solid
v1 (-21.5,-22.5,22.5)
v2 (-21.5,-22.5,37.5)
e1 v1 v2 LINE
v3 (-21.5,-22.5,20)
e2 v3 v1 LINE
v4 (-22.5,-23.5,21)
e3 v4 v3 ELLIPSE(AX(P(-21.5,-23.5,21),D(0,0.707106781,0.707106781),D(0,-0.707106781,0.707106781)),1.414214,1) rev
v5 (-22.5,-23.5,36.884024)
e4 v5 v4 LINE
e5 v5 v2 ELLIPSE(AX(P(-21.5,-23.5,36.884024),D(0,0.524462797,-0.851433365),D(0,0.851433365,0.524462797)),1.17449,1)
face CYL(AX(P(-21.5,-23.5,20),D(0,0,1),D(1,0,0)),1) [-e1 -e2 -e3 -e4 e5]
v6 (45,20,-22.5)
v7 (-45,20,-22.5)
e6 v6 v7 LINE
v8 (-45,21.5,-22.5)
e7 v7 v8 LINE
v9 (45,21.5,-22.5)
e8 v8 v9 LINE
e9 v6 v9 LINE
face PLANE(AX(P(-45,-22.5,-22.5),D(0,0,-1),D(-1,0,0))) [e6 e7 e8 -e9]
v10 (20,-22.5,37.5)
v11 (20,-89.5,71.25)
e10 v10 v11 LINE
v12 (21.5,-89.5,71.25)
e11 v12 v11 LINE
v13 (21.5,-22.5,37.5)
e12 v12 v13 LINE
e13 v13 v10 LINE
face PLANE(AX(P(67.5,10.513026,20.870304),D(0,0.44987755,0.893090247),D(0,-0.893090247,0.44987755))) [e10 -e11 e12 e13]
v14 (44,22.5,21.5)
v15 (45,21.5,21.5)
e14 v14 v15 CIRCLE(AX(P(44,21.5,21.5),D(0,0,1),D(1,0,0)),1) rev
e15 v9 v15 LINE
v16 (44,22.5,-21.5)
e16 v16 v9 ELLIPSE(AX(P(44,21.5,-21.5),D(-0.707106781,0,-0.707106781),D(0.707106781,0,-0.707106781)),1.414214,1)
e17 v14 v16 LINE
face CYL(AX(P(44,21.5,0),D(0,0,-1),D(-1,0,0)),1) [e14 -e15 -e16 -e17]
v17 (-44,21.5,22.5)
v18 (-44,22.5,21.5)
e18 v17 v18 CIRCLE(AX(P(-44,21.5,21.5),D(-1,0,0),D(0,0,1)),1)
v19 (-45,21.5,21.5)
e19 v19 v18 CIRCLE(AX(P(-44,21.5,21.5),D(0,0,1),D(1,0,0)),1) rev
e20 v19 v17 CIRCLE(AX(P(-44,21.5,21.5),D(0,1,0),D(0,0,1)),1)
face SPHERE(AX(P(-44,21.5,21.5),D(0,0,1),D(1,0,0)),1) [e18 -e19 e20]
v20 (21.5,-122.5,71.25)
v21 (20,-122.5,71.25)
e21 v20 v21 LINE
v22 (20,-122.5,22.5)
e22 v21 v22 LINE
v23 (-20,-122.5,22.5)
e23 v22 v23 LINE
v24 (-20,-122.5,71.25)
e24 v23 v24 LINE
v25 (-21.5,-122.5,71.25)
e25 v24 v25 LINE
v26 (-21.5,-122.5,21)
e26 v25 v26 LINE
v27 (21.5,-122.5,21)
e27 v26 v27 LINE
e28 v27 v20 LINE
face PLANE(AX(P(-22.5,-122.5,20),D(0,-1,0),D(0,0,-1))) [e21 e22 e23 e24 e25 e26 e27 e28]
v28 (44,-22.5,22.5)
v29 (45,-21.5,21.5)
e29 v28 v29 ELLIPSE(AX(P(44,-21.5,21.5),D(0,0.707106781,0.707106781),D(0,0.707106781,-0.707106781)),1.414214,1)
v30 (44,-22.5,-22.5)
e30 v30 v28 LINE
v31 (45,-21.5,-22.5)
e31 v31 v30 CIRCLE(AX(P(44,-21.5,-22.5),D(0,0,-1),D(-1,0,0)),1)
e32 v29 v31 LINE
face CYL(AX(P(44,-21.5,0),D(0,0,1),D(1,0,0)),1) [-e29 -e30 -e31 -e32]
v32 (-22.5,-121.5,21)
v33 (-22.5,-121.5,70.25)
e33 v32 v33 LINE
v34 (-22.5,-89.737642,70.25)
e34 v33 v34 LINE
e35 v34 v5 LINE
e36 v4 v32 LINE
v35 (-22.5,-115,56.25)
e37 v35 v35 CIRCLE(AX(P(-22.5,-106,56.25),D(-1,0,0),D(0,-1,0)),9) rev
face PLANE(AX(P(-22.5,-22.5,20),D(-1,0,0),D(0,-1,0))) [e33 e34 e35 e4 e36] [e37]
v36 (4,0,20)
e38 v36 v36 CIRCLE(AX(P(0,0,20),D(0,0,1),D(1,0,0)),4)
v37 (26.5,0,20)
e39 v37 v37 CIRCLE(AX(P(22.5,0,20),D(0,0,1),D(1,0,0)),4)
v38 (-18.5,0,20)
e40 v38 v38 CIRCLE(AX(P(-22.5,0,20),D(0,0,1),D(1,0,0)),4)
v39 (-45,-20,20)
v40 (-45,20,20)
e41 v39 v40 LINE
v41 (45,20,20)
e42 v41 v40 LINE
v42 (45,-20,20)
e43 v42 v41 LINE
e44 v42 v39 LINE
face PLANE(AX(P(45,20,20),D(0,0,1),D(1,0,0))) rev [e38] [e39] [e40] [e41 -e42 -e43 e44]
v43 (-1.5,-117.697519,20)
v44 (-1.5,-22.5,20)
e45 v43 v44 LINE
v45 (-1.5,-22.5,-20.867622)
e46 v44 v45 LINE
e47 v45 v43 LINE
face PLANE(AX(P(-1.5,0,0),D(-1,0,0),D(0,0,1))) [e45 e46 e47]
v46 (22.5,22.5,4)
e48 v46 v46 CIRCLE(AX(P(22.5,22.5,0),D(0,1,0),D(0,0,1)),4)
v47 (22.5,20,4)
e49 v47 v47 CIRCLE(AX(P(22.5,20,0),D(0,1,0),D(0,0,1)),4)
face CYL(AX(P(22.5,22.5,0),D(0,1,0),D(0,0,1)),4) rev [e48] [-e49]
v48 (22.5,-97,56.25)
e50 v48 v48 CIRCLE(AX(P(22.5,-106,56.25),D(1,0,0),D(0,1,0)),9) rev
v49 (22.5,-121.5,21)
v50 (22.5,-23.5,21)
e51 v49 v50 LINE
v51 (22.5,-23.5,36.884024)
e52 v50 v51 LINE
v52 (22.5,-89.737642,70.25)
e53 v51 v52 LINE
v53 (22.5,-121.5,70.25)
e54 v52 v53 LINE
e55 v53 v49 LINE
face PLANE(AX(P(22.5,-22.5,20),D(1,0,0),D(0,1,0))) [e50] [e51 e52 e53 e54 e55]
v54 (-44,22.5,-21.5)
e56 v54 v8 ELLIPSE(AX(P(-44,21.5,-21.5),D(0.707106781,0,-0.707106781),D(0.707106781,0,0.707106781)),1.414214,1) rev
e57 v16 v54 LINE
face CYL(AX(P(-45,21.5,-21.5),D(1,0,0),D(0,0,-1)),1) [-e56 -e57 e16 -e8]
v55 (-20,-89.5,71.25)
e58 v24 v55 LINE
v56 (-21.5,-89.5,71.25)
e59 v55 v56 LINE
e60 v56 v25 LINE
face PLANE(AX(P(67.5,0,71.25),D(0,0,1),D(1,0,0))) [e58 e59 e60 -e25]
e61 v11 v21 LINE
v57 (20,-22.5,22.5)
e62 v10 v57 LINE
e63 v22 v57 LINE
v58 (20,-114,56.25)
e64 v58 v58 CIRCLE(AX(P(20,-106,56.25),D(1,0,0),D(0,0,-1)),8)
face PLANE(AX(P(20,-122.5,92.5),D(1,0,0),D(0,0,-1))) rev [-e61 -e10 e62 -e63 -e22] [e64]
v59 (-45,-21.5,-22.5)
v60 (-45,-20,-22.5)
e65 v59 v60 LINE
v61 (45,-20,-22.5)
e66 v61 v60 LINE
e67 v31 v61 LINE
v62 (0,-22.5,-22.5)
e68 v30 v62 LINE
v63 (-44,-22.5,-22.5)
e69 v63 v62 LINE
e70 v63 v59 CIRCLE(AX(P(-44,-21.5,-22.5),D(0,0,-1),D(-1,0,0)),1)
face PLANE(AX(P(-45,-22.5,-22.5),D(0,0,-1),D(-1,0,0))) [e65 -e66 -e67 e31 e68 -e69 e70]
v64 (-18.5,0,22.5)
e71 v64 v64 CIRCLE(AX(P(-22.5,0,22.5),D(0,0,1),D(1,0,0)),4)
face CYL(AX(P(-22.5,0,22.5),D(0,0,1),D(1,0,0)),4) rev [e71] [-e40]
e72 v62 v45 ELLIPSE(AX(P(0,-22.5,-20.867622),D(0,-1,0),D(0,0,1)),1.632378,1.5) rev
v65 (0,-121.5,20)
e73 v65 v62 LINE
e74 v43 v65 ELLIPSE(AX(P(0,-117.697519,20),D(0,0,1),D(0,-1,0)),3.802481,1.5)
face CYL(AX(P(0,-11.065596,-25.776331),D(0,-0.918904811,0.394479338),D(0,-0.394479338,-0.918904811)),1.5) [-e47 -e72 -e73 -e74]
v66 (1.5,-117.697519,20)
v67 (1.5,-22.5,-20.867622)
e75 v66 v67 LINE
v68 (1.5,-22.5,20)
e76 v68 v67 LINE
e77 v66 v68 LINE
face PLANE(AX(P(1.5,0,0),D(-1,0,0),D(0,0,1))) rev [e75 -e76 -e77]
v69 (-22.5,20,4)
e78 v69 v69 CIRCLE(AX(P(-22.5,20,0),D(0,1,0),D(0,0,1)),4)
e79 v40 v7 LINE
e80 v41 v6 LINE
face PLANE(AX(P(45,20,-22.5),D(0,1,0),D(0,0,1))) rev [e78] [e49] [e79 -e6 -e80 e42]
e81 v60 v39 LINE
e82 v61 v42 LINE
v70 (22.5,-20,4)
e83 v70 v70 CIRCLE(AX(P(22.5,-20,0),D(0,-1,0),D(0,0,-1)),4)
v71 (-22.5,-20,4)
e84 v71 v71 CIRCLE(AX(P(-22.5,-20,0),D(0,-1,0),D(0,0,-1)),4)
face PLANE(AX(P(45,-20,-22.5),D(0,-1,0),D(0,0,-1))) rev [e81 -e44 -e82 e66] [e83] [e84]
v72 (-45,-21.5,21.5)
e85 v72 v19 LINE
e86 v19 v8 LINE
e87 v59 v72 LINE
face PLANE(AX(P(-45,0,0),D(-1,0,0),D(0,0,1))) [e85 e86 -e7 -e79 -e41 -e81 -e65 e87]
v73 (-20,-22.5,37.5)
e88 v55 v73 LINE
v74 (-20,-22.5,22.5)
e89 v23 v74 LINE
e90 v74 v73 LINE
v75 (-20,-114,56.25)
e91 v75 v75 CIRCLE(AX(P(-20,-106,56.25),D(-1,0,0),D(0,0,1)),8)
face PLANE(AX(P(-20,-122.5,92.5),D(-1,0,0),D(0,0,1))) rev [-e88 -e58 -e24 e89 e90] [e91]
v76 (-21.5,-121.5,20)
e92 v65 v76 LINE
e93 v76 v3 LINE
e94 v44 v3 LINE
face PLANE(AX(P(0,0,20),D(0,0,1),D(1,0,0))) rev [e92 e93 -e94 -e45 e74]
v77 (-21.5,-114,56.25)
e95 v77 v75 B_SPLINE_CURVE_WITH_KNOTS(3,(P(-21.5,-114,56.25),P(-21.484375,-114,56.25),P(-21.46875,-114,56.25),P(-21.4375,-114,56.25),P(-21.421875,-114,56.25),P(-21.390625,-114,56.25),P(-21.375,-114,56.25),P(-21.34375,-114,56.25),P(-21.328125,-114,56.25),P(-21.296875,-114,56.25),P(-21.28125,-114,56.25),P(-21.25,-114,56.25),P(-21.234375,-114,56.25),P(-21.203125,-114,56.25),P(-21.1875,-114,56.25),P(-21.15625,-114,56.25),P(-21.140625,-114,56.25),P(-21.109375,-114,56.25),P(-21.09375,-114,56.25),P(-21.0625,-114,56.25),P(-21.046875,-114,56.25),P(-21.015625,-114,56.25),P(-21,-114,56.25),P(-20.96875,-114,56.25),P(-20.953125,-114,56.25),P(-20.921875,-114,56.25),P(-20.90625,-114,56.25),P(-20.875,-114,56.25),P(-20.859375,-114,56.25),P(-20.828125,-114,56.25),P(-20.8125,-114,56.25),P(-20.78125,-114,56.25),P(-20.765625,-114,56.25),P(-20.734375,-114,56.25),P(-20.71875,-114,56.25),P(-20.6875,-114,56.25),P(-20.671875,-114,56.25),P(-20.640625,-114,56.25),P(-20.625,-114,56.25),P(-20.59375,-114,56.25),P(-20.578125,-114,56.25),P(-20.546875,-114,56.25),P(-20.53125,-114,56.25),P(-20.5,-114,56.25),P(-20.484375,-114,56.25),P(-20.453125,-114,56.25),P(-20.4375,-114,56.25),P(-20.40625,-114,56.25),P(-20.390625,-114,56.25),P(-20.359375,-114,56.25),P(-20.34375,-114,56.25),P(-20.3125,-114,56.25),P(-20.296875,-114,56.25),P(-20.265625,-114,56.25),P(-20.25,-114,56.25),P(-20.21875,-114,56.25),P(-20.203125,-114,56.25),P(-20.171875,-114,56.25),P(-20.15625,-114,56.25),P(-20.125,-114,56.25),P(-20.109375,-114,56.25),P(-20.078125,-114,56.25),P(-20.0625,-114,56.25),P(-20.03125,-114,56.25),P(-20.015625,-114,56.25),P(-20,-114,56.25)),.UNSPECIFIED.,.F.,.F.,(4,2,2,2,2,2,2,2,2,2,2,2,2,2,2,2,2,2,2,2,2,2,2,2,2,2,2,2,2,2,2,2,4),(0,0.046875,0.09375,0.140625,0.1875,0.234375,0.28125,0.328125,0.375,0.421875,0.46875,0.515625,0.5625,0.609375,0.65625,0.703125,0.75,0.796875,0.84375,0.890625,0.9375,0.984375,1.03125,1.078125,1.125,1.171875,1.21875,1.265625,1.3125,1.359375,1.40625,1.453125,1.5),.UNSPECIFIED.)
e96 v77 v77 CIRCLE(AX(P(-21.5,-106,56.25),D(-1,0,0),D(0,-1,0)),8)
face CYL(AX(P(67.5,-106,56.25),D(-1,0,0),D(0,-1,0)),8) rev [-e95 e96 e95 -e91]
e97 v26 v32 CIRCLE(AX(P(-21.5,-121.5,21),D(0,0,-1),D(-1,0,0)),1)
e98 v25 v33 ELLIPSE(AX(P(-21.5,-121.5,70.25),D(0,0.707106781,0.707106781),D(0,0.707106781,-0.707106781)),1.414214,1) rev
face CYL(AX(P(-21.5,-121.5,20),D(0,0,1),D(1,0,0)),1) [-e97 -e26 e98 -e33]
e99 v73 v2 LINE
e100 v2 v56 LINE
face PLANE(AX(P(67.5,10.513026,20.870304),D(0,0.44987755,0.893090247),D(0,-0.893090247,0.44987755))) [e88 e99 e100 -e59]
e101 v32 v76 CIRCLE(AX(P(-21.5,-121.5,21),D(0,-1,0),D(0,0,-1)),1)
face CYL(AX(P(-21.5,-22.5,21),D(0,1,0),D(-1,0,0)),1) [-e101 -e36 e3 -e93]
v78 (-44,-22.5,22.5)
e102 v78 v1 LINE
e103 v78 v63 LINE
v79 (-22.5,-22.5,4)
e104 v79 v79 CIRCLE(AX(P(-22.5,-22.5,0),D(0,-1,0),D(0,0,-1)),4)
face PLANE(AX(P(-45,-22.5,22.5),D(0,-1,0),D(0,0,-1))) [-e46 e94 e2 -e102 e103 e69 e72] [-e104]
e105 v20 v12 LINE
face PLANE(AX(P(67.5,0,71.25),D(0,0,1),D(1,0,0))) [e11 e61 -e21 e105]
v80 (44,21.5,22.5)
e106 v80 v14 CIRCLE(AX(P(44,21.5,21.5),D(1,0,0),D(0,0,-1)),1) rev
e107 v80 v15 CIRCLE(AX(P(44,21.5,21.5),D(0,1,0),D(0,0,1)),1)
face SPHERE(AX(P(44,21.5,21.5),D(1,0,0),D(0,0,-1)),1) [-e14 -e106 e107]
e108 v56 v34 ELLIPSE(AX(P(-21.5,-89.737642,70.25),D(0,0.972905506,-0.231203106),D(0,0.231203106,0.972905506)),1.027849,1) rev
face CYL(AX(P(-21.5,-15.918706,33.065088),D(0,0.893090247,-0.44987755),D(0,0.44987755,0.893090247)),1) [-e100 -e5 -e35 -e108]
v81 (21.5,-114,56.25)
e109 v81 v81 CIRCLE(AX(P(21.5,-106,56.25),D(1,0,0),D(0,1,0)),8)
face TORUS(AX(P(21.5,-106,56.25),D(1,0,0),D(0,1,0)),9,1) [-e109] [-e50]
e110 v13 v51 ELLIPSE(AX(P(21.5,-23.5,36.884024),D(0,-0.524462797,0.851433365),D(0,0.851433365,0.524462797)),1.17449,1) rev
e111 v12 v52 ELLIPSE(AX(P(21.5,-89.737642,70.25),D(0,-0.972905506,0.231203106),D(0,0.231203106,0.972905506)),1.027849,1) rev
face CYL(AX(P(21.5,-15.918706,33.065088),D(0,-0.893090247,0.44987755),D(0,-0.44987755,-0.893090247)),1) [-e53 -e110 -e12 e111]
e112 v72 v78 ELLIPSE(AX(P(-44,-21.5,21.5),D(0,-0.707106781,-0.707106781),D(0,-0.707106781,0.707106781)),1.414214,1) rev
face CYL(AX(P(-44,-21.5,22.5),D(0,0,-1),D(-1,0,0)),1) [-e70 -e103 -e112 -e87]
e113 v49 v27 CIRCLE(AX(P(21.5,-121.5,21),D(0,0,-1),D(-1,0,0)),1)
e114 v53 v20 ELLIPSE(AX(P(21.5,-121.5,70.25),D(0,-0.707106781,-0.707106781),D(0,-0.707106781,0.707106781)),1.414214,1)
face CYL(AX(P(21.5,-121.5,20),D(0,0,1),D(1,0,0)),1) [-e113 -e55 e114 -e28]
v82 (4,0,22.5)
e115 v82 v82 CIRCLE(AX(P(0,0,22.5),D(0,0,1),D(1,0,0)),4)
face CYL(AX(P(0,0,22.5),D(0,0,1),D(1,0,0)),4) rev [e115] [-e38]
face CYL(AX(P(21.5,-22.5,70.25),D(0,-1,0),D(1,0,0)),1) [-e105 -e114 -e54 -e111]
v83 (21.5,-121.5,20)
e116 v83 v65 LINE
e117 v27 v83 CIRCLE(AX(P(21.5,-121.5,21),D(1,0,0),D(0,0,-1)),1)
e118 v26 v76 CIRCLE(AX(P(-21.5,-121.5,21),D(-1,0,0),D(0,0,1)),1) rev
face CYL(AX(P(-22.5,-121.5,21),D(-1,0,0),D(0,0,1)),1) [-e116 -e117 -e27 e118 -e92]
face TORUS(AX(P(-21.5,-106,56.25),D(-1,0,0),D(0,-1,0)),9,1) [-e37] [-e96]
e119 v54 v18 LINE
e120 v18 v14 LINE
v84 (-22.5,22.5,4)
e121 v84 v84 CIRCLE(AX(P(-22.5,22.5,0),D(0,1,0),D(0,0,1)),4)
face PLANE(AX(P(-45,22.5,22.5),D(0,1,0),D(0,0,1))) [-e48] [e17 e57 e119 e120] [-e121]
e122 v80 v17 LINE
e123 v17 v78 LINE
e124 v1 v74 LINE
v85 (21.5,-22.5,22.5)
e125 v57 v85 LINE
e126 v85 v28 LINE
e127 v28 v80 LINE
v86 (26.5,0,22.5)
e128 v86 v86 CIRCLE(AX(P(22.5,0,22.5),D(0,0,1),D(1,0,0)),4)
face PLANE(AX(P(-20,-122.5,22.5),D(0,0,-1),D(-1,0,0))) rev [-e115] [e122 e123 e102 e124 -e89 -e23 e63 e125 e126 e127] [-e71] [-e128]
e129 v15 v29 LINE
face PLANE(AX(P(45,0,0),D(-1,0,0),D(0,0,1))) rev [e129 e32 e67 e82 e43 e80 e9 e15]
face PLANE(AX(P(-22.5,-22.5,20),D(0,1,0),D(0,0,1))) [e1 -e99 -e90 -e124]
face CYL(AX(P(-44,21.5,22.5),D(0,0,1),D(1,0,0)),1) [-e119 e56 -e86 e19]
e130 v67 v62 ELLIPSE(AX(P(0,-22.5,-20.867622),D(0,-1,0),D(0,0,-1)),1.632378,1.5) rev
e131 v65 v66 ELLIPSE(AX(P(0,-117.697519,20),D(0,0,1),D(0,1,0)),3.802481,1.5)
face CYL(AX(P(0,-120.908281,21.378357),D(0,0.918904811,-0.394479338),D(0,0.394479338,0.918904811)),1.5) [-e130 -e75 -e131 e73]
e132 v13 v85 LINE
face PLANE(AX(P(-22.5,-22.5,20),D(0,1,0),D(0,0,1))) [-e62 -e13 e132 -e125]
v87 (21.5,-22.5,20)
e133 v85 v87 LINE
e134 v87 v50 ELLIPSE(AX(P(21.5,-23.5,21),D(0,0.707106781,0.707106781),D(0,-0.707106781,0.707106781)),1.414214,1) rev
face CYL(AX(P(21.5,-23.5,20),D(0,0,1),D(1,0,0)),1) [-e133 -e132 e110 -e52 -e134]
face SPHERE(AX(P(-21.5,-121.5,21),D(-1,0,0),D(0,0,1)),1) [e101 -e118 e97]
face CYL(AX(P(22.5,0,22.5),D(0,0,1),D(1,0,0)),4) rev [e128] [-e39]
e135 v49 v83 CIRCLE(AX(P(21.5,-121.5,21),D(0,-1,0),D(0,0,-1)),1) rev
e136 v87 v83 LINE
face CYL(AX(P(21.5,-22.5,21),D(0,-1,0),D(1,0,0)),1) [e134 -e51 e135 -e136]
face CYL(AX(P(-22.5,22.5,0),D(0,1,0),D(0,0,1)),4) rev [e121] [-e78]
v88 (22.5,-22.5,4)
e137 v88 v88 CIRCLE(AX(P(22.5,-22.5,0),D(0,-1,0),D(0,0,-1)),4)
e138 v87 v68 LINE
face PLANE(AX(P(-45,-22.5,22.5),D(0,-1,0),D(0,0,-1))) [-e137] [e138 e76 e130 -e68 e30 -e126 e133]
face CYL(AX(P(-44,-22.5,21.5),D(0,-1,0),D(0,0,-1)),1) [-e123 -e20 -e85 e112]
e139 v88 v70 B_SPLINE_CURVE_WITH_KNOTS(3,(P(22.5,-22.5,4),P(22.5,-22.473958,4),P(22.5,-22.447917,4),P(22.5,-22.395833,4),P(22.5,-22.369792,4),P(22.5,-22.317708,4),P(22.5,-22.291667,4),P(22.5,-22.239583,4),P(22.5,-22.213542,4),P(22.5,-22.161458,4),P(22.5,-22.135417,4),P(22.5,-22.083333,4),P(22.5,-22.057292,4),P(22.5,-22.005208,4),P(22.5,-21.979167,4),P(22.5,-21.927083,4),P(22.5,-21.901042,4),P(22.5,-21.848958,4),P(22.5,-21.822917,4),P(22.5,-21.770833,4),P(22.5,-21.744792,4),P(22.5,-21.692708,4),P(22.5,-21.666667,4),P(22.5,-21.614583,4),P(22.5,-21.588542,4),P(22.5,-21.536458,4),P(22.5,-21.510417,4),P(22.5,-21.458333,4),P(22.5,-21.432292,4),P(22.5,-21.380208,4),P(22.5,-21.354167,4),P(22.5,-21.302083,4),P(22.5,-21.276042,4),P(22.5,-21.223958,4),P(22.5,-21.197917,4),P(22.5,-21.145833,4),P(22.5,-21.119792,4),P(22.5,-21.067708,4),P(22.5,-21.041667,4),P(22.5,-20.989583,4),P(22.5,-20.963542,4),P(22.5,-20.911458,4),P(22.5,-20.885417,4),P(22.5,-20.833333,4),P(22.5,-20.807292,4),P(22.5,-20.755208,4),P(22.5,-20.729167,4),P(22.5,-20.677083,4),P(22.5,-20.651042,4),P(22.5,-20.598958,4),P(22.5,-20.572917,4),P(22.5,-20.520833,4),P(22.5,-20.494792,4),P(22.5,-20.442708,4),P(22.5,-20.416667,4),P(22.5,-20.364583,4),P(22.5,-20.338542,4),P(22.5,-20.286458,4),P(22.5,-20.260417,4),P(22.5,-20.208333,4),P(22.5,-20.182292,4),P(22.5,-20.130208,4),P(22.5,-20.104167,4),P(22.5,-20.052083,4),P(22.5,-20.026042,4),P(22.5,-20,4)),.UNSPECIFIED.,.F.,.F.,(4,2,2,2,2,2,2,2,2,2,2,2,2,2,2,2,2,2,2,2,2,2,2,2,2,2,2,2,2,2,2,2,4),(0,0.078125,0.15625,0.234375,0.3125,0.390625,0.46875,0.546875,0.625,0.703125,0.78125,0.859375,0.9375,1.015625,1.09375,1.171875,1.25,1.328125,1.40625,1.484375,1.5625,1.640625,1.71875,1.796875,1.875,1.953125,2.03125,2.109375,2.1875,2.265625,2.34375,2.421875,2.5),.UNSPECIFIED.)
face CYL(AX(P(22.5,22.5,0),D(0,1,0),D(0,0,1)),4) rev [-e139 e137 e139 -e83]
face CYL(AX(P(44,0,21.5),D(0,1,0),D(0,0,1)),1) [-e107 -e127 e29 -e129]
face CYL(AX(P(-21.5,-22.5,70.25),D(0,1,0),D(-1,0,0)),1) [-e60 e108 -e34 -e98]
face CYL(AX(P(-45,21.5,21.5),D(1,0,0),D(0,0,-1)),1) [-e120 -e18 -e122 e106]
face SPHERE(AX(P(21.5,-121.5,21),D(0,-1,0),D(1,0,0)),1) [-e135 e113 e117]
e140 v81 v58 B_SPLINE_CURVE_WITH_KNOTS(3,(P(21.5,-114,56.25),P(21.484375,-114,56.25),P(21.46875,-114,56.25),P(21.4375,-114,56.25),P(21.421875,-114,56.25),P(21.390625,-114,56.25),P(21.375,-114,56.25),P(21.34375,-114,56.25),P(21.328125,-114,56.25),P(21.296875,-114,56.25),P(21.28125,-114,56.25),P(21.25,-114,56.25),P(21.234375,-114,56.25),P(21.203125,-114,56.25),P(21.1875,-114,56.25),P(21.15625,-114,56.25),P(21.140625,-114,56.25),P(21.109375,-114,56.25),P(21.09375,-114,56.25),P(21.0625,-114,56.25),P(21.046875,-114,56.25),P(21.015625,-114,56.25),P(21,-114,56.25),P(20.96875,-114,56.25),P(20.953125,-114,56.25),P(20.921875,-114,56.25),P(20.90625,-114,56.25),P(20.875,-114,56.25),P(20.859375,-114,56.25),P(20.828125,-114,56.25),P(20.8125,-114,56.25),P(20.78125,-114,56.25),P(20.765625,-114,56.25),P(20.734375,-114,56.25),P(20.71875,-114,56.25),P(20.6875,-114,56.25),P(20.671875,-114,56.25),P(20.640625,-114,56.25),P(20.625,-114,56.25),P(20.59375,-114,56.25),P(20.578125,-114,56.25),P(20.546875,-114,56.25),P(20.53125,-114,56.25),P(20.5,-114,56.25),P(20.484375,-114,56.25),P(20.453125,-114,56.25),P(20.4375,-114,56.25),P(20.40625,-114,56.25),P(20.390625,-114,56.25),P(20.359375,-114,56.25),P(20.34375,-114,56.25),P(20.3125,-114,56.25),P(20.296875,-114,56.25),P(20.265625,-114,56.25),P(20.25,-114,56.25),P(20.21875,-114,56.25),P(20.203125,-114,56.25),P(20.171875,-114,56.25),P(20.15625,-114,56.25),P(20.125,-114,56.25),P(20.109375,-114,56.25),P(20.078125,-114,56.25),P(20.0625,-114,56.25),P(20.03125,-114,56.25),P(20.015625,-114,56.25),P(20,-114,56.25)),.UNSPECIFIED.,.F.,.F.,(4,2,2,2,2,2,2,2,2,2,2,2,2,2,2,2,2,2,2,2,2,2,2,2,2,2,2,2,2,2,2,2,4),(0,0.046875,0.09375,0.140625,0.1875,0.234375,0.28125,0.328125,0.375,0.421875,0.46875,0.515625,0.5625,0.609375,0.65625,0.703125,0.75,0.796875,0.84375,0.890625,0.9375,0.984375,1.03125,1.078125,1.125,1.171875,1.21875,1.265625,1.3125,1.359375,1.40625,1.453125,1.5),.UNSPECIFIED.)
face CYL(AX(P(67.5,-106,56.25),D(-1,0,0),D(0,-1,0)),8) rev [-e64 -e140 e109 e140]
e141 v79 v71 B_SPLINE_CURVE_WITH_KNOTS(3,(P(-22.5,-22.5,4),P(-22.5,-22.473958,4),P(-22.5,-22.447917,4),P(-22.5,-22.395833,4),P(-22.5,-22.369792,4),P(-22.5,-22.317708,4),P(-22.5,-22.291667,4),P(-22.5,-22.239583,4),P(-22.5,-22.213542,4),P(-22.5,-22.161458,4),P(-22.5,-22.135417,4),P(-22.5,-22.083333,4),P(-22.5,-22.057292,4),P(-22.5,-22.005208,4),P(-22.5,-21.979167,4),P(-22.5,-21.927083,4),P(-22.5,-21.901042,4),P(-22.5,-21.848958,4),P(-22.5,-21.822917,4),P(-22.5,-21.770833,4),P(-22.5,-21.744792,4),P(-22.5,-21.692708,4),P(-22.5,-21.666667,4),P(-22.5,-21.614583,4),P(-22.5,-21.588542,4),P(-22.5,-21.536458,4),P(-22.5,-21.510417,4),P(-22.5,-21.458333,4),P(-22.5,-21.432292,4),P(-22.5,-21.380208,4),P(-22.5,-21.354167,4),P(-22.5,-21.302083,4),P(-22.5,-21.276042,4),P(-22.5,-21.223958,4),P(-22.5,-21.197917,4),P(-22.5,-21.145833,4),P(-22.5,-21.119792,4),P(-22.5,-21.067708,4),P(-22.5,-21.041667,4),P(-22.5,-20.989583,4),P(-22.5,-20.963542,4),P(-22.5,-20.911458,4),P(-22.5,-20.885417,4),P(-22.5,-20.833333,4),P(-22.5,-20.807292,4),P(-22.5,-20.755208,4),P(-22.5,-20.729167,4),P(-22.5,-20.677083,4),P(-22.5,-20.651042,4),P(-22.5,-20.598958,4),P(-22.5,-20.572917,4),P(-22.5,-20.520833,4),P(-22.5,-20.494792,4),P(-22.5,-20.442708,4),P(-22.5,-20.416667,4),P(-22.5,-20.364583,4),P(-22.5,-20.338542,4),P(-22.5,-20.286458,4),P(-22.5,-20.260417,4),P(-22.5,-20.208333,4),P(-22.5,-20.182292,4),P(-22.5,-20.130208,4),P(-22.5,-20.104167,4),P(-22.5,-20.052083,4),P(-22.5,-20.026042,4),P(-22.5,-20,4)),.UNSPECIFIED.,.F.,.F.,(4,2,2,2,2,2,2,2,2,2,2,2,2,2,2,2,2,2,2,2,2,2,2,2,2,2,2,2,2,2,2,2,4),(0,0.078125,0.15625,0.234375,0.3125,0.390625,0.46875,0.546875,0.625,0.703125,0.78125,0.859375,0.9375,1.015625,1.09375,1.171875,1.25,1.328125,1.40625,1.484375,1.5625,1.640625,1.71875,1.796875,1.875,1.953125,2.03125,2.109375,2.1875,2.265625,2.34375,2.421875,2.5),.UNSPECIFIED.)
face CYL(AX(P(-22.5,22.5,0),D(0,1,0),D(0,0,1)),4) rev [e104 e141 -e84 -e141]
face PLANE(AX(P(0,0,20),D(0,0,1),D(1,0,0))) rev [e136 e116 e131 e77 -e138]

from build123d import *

# Parameters (mm, degrees)
DODANIE_WYCI_GNI_CIE1_DEPTH         = 45
DODANIE_WYCI_GNI_CIE1_DEPTH_BACK    = 45
SZKIC1_W                            = 45
SZKIC1_H                            = 45
WYTNIJ_WYCI_GNI_CIE1_DEPTH          = 96.45941546
WYTNIJ_WYCI_GNI_CIE1_DEPTH_BACK     = 96.45941546
SZKIC2_W                            = 42.5
SZKIC2_H                            = 40
DODANIE_WYCI_GNI_CIE2_DEPTH         = 70
DODANIE_WYCI_GNI_CIE2_DEPTH_BACK    = 2.5
SZKIC3_W                            = 45
SZKIC3_H                            = 100
SZKIC4_W                            = 40
SZKIC4_H                            = 70
WYTNIJ_WYCI_GNI_CIE2_DEPTH          = 144.461667354
SZKIC5_R                            = 8
WYTNIJ_WYCI_GNI_CIE4_DEPTH          = 90
ZAOKR_GLENIE2_R                     = 1
ZAOKR_GLENIE3_R                     = 1
SZKIC9_W                            = 4
SZKIC9_H                            = 45
OTWORY_USTALAJ_CE_8_0MM1_AT_2_COUNT = 2
OTWORY_USTALAJ_CE_8_0MM1_AT_2_PITCH = 22.5
OTWORY_USTALAJ_CE_8_0MM1_AT_3_COUNT = 2
OTWORY_USTALAJ_CE_8_0MM1_AT_3_PITCH = 45
SZKIC13_W                           = 4
SZKIC13_H                           = 145
OTWORY_USTALAJ_CE_8_0MM3_AT_2_COUNT = 2
OTWORY_USTALAJ_CE_8_0MM3_AT_2_PITCH = 45
DODANIE_WYCI_GNI_CIE3_DEPTH         = 1.5
DODANIE_WYCI_GNI_CIE3_DEPTH_BACK    = 1.5
ZAOKR_GLENIE4_R                     = 1.5


with BuildPart() as part:
    # Szkic1 → Dodanie-wyciągnięcie1 (new, two sides: drawn at the far end of the back side and taken through both)
    with BuildSketch(Plane(origin=(0, 0, 0), x_dir=(0, 0, -1), z_dir=(1, 0, 0)).offset(-DODANIE_WYCI_GNI_CIE1_DEPTH_BACK)):
        Rectangle(SZKIC1_W, SZKIC1_H)
    extrude(amount=DODANIE_WYCI_GNI_CIE1_DEPTH + DODANIE_WYCI_GNI_CIE1_DEPTH_BACK)

    # Szkic2 → Wytnij-wyciągnięcie1 (cut, two sides: drawn at the far end of the back side and taken through both)
    with BuildSketch(Plane.ZY.offset(45).offset(-WYTNIJ_WYCI_GNI_CIE1_DEPTH_BACK)):
        with Locations((-1.25, 0)):
            Rectangle(SZKIC2_W, SZKIC2_H)
    extrude(amount=WYTNIJ_WYCI_GNI_CIE1_DEPTH + WYTNIJ_WYCI_GNI_CIE1_DEPTH_BACK, mode=Mode.SUBTRACT)

    # Zaokrąglenie2
    zaokr_glenie2_edges = [part.edges().sort_by_distance(p)[0] for p in [
        (-45, 0, 22.5),
        (45, 22.5, 0),
        (45, 0, 22.5),
        (45, -22.5, 0),
        (-45, -22.5, 0),
        (0, 22.5, 22.5),
        (0, 22.5, -22.5),
        (-45, 22.5, 0),
    ]]
    fillet(zaokr_glenie2_edges, radius=ZAOKR_GLENIE2_R)

    # Szkic9 → Otwory ustalające Ø8.0mm1 (revolve, cut)
    with BuildSketch(Plane(origin=(-22.5, 0, 22.5), x_dir=(0, -1, 0), z_dir=(1, 0, 0))):
        with Locations((2, 22.5)):
            Rectangle(SZKIC9_W, SZKIC9_H)
    otwory_ustalaj_ce_8_0mm1 = revolve(axis=Axis((-22.5, 0, 28.85), (0, 0, -1)), mode=Mode.SUBTRACT)

    # Otwory ustalające Ø8.0mm1 at 2: Otwory ustalające Ø8.0mm1 ×2
    with Locations(*[(i * OTWORY_USTALAJ_CE_8_0MM1_AT_2_PITCH, 0, 0) for i in range(1, OTWORY_USTALAJ_CE_8_0MM1_AT_2_COUNT)]):
        add(otwory_ustalaj_ce_8_0mm1, mode=Mode.SUBTRACT)

    # Otwory ustalające Ø8.0mm1 at 3: Otwory ustalające Ø8.0mm1 ×2
    with Locations(*[(i * OTWORY_USTALAJ_CE_8_0MM1_AT_3_PITCH, 0, 0) for i in range(1, OTWORY_USTALAJ_CE_8_0MM1_AT_3_COUNT)]):
        add(otwory_ustalaj_ce_8_0mm1, mode=Mode.SUBTRACT)

    # Szkic13 → Otwory ustalające Ø8.0mm3 (revolve, cut)
    with BuildSketch(Plane(origin=(22.5, 22.5, 0), x_dir=(0, 0, 1), z_dir=(1, 0, 0))):
        with Locations((2, 72.5)):
            Rectangle(SZKIC13_W, SZKIC13_H)
    otwory_ustalaj_ce_8_0mm3 = revolve(axis=Axis((22.5, 28.85, 0), (0, -1, 0)), mode=Mode.SUBTRACT)

    # Otwory ustalające Ø8.0mm3 at 2: Otwory ustalające Ø8.0mm3 ×2
    with Locations(*[(-i * OTWORY_USTALAJ_CE_8_0MM3_AT_2_PITCH, 0, 0) for i in range(1, OTWORY_USTALAJ_CE_8_0MM3_AT_2_COUNT)]):
        add(otwory_ustalaj_ce_8_0mm3, mode=Mode.SUBTRACT)



with BuildPart() as body_2:
    # Szkic3 → Dodanie-wyciągnięcie2 (new, two sides: drawn at the far end of the back side and taken through both)
    with BuildSketch(Plane.XY.offset(22.5).offset(-DODANIE_WYCI_GNI_CIE2_DEPTH_BACK)):
        with Locations((0, -72.5)):
            Rectangle(SZKIC3_W, SZKIC3_H)
    extrude(amount=DODANIE_WYCI_GNI_CIE2_DEPTH + DODANIE_WYCI_GNI_CIE2_DEPTH_BACK)

    # Szkic4 → Wytnij-wyciągnięcie2 (cut, through all)
    with BuildSketch(Plane(origin=(0, -22.5, 0), x_dir=(1, 0, 0), z_dir=(0, 1, 0))):
        with Locations((0, -57.5)):
            Rectangle(SZKIC4_W, SZKIC4_H)
    extrude(amount=-WYTNIJ_WYCI_GNI_CIE2_DEPTH, mode=Mode.SUBTRACT)

    # Szkic5 → Wytnij-wyciągnięcie4 (cut)
    with BuildSketch(Plane.ZY.offset(22.5)):
        Polygon((71.25, -89.5), (71.25, -122.5), (92.5, -122.5), (92.5, -22.5), (37.5, -22.5), align=None)
        with Locations(Location((56.25, -106, 0), (0, 0, 270))):
            Circle(SZKIC5_R)
    extrude(amount=-WYTNIJ_WYCI_GNI_CIE4_DEPTH, mode=Mode.SUBTRACT)

    # Zaokrąglenie3
    zaokr_glenie3_edges = [body_2.edges().sort_by_distance(p)[0] for p in [
        (22.5, -72.5, 20),
        (22.5, -98, 56.25),
        (-22.5, -98, 56.25),
        (-22.5, -72.5, 20),
        (-22.5, -56, 54.375),
        (22.5, -56, 54.375),
        (-22.5, -106, 71.25),
        (22.5, -106, 71.25),
        (-22.5, -22.5, 28.75),
        (22.5, -22.5, 28.75),
        (22.5, -122.5, 45.625),
        (-22.5, -122.5, 45.625),
        (0, -122.5, 20),
    ]]
    fillet(zaokr_glenie3_edges, radius=ZAOKR_GLENIE3_R)


with BuildPart() as part_1:
    add(part.part)

    add(body_2.part)  # Dodanie-wyciągnięcie3 merges body 2
    # Szkic14 → Dodanie-wyciągnięcie3 (add, two sides: drawn at the far end of the back side and taken through both)
    with BuildSketch(Plane.ZY.offset(-DODANIE_WYCI_GNI_CIE3_DEPTH_BACK)):
        Polygon((20, -121.5), (-22.5, -22.5), (20, -22.5), align=None)
    extrude(amount=DODANIE_WYCI_GNI_CIE3_DEPTH + DODANIE_WYCI_GNI_CIE3_DEPTH_BACK)

    # Zaokrąglenie4
    zaokr_glenie4_edges = [part_1.edges().sort_by_distance(p)[0] for p in [
        (1.5, -72, -1.25),
        (-1.5, -72, -1.25),
    ]]
    fillet(zaokr_glenie4_edges, radius=ZAOKR_GLENIE4_R - 0.0001)  # a hair under: the kernel refuses the full size


solid = part_1.part
